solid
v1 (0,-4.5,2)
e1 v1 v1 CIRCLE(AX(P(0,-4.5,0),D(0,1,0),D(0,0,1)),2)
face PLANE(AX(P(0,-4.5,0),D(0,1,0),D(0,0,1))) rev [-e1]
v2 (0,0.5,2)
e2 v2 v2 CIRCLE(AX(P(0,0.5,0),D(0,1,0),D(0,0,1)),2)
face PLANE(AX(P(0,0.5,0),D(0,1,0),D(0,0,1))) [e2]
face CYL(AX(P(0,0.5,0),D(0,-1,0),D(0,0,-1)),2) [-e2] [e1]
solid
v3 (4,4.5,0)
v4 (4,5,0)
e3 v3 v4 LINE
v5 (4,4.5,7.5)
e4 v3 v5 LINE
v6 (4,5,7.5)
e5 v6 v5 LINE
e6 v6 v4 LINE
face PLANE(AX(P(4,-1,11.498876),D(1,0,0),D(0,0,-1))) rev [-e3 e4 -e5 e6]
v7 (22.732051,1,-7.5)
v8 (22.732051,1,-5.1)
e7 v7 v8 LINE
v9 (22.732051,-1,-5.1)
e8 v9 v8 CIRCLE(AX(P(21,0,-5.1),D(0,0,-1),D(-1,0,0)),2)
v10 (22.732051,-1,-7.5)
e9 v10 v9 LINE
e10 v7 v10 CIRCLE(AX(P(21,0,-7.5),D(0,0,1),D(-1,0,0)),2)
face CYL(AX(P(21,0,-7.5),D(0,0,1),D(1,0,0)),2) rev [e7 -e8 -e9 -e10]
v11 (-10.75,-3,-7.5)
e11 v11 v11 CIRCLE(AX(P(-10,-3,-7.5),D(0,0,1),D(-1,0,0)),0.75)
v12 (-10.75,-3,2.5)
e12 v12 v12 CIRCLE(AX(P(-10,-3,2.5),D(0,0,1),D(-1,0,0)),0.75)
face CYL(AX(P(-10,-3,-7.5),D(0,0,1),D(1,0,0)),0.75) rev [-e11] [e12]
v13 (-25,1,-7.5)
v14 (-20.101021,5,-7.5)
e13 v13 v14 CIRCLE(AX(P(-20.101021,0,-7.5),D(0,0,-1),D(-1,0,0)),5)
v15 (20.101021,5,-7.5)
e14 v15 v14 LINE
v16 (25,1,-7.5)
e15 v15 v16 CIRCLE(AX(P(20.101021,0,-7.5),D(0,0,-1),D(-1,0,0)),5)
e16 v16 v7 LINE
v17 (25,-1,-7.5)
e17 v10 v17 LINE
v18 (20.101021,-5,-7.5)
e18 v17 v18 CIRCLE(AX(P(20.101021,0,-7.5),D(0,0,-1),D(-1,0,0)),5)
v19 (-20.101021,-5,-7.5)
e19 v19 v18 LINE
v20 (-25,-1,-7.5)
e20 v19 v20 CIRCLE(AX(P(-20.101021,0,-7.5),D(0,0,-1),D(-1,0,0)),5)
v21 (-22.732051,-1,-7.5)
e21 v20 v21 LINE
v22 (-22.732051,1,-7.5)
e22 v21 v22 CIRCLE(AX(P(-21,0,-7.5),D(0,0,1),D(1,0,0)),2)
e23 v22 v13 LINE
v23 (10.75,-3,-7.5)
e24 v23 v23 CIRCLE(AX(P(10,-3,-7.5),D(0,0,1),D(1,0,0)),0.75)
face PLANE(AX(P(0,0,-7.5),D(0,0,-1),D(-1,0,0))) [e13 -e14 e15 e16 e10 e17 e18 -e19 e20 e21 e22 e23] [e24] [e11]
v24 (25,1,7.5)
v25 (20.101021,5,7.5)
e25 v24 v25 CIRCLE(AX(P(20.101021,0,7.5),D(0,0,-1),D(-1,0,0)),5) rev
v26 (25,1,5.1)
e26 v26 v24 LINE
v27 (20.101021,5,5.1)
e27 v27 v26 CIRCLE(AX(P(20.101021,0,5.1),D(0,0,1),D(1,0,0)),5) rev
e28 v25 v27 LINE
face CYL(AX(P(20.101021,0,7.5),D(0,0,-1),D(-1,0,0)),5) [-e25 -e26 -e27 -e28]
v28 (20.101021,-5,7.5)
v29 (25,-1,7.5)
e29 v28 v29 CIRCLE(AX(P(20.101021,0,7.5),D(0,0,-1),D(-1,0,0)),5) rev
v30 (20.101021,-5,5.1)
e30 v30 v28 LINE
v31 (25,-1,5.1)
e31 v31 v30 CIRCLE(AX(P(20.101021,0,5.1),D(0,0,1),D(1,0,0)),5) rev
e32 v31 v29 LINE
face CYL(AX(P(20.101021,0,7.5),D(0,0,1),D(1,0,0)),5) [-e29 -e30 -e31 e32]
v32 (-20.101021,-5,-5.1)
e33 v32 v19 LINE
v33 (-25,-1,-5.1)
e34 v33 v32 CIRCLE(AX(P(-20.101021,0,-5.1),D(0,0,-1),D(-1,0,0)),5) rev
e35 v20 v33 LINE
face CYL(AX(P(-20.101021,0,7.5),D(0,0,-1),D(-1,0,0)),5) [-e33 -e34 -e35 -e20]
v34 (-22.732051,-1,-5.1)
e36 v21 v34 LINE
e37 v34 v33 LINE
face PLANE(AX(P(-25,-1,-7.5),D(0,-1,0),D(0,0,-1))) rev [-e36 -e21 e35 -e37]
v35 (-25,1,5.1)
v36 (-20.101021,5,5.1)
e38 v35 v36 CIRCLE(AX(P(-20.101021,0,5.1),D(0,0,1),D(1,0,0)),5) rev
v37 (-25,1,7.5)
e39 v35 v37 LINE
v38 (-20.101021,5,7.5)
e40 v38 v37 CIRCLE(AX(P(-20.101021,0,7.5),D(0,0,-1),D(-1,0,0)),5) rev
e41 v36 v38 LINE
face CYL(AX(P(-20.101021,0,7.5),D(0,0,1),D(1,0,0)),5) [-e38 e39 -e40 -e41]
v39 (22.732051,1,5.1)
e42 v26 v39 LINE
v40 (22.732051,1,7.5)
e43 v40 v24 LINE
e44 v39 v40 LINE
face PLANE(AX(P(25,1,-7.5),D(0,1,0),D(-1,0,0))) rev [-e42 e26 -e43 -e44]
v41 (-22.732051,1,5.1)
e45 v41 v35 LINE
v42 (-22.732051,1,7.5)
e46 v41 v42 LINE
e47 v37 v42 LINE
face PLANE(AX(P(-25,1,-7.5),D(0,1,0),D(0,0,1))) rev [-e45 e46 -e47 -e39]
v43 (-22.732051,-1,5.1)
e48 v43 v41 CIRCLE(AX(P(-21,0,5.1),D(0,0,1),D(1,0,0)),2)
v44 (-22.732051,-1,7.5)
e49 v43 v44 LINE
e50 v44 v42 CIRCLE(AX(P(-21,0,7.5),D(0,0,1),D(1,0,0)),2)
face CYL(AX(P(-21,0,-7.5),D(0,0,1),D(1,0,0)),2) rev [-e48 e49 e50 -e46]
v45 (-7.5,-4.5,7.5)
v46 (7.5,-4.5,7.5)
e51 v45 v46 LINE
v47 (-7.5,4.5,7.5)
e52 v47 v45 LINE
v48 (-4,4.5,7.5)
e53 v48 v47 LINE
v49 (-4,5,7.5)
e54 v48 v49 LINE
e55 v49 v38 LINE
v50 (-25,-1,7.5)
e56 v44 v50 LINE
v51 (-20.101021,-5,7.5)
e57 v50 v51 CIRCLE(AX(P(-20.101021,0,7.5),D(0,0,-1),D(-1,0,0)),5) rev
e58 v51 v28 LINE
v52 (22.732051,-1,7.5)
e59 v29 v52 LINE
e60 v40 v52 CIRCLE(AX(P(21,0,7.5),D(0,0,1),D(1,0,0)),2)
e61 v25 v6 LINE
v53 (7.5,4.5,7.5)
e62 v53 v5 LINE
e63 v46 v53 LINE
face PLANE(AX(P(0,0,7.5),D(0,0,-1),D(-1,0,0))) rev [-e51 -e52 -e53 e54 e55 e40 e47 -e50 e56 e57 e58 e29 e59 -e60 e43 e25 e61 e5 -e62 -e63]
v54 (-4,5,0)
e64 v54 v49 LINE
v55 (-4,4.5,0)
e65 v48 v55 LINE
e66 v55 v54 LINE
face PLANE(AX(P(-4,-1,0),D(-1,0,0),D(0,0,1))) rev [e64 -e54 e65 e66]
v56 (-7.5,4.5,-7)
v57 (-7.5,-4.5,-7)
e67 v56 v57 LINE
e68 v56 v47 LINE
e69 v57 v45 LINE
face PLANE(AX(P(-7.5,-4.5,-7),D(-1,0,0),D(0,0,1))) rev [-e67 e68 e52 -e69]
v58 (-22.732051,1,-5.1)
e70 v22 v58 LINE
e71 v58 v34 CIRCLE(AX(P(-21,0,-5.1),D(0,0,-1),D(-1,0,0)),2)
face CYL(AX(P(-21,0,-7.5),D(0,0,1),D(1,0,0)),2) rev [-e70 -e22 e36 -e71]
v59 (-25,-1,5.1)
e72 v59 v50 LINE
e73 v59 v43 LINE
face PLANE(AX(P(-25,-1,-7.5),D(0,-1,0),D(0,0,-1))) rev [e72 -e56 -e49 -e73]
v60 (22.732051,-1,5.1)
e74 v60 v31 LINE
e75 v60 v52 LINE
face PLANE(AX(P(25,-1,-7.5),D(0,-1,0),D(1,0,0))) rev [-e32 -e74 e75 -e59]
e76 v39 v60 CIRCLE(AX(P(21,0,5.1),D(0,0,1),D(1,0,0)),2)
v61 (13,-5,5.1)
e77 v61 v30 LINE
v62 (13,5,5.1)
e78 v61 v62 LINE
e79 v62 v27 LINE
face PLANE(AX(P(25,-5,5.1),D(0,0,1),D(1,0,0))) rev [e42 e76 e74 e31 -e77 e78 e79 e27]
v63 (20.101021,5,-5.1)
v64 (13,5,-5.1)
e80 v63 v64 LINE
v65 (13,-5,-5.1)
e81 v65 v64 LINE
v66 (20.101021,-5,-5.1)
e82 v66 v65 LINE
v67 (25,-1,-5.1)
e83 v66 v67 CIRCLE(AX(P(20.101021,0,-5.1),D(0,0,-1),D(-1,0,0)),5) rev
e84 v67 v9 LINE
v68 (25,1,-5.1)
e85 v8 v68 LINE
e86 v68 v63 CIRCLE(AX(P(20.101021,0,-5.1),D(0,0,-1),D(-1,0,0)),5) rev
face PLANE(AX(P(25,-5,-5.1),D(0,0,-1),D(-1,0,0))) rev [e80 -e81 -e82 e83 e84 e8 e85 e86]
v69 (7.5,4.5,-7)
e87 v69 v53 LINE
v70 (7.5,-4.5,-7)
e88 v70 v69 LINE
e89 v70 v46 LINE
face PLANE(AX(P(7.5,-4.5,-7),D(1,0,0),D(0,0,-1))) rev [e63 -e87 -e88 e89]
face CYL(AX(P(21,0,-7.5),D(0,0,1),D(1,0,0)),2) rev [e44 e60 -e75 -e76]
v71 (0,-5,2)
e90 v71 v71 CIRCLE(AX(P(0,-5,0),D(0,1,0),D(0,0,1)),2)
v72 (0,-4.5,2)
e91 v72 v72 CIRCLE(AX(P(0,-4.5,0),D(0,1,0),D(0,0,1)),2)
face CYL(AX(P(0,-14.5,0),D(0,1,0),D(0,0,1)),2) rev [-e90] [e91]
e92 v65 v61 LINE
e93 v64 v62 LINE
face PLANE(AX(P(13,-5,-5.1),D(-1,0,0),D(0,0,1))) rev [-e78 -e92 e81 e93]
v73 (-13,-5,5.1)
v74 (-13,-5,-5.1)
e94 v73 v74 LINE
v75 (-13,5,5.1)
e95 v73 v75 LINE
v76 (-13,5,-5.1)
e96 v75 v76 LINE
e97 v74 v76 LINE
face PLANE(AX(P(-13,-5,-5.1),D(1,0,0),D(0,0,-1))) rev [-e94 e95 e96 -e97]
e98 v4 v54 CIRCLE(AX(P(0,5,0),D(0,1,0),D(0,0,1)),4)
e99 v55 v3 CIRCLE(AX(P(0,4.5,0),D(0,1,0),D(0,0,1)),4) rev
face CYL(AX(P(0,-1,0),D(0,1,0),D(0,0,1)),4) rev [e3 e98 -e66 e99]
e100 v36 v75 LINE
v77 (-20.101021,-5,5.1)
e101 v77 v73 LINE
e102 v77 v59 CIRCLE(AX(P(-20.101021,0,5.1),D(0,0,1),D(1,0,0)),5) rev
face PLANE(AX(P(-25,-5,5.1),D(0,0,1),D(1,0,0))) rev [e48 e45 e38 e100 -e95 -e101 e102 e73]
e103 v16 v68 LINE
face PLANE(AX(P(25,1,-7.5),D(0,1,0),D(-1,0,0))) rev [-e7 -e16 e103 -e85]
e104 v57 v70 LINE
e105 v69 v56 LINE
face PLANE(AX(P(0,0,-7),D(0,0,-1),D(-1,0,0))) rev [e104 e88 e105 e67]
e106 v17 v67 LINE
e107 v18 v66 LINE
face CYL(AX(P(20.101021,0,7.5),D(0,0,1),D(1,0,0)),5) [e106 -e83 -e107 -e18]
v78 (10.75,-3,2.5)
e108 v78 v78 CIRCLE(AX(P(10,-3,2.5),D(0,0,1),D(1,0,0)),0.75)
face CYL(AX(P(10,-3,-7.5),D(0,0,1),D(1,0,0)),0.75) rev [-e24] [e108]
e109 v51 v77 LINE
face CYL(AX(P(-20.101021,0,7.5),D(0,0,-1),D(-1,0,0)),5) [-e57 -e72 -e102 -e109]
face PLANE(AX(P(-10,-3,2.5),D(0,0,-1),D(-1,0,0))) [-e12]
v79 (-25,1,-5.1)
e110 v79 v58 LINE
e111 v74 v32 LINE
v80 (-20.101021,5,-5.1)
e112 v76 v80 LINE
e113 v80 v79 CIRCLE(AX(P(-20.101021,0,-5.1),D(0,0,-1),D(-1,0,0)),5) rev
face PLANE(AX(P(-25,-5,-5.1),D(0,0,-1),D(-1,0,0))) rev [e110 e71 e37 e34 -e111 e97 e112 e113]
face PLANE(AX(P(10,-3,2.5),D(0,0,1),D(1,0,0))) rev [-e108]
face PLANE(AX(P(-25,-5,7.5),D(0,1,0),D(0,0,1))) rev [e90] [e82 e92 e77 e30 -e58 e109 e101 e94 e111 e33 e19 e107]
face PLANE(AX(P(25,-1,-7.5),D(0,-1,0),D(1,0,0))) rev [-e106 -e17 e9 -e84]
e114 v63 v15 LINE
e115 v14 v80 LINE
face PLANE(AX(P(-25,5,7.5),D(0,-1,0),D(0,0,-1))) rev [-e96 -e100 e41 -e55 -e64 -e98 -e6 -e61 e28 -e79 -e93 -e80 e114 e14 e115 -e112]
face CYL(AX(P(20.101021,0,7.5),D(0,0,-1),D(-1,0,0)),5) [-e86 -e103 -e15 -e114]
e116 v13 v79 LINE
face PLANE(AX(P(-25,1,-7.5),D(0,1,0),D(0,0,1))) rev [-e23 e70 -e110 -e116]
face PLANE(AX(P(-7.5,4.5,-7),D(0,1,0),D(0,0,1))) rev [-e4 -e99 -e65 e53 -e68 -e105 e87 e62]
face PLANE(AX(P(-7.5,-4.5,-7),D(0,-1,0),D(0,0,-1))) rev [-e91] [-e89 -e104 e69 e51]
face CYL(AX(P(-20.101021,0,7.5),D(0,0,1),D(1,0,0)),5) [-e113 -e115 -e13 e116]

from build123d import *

# Parameters (mm, degrees)
SKETCH_1_W               = 50
SKETCH_1_H               = 10
EXTRUDE_1_DEPTH          = 7.5
CUT_EXTRUDE_1_DEPTH      = 6
SKETCH_4_W               = 15
SKETCH_4_H               = 9
CUT_EXTRUDE_2_DEPTH      = 14.5
SKETCH_5_R               = 2
EXTRUDE_2_DEPTH          = 5
SKETCH_6_W               = 12
SKETCH_6_H               = 10.2
CUT_EXTRUDE_3_DEPTH      = 28.950849719
CUT_EXTRUDE_4_DEPTH      = 30.580398915
CUT_EXTRUDE_4_DEPTH_BACK = 30.580398915
FILLET_1_R               = 5
CUT_EXTRUDE_START        = -5
SKETCH_8_R               = 0.75
CUT_EXTRUDE_5_DEPTH      = 10
EXTRUDE_START            = -0.5
SKETCH_5_2_R             = 2
EXTRUDE_1_2_DEPTH        = 0.5
CUT_EXTRUDE_START_2      = -10
SKETCH_5_3_R             = 2
CUT_EXTRUDE_1_2_DEPTH    = 10


with BuildPart() as part:
    # 草图1 → Extrude 1 (new, symmetric)
    with BuildSketch(Plane.XY):
        Rectangle(SKETCH_1_W, SKETCH_1_H)
    extrude(amount=EXTRUDE_1_DEPTH, both=True)

    # 草图3 → Cut-Extrude 1 (cut)
    with BuildSketch(Plane(origin=(0, 5, 0), x_dir=(1, 0, 0), z_dir=(0, 1, 0))):
        with BuildLine():
            Line((-4, 0), (-4, -11.498876283))
            Line((-4, -11.498876283), (4, -11.498876283))
            Line((4, -11.498876283), (4, 0))
            ThreePointArc((4, 0), (0, 4), (-4, 0))
        make_face()
    extrude(amount=-CUT_EXTRUDE_1_DEPTH, mode=Mode.SUBTRACT)

    # 草图4 → 切除-拉伸2 (cut)
    with BuildSketch(Plane.XY.offset(7.5)):
        Rectangle(SKETCH_4_W, SKETCH_4_H)
    extrude(amount=-CUT_EXTRUDE_2_DEPTH, mode=Mode.SUBTRACT)

    # 草图5 → 凸台-拉伸2 (add)
    with BuildSketch(Plane(origin=(0, -4.5, 0), x_dir=(1, 0, 0), z_dir=(0, 1, 0))):
        with Locations(Location((0, 0, 0), (0, 0, 90))):
            Circle(SKETCH_5_R)
    extrude(amount=EXTRUDE_2_DEPTH)

    # 草图6 → 切除-拉伸3 (cut, through all)
    with BuildSketch(Plane(origin=(0, 5, 0), x_dir=(1, 0, 0), z_dir=(0, 1, 0))):
        with Locations((-19, 0)):
            Rectangle(SKETCH_6_W, SKETCH_6_H)
        with Locations((19, 0)):
            Rectangle(SKETCH_6_W, SKETCH_6_H)
    extrude(amount=-CUT_EXTRUDE_3_DEPTH, mode=Mode.SUBTRACT)

    # 草图7 → 切除-拉伸4 (cut, two sides: drawn at the far end of the back side and taken through both)
    with BuildSketch(Plane.XY.offset(7.5).offset(-CUT_EXTRUDE_4_DEPTH_BACK)):
        with BuildLine():
            Line((-25, 1), (-22.732050808, 1))
            ThreePointArc((-22.732050808, 1), (-19, 0), (-22.732050808, -1))
            Line((-22.732050808, -1), (-25, -1))
            Line((-25, -1), (-25, 1))
        make_face()
        with BuildLine():
            Line((25, -1), (22.732050808, -1))
            ThreePointArc((22.732050808, -1), (19, 0), (22.732050808, 1))
            Line((22.732050808, 1), (25, 1))
            Line((25, 1), (25, -1))
        make_face()
    extrude(amount=CUT_EXTRUDE_4_DEPTH + CUT_EXTRUDE_4_DEPTH_BACK, mode=Mode.SUBTRACT)

    # 圆角1
    # the kernel refuses this fillet: 5 mm, written as the material it takes off along each edge
    with BuildSketch(Plane(origin=(25, 5, -19.747448714), x_dir=(-1, 0, 0), z_dir=(0, 0, 1)), Plane(origin=(25, 5, -7.147448714), x_dir=(-1, 0, 0), z_dir=(0, 0, 1)), Plane(origin=(-25, 5, 7.147448714), x_dir=(1, 0, 0), z_dir=(0, 0, -1)), Plane(origin=(-25, 5, 19.747448714), x_dir=(1, 0, 0), z_dir=(0, 0, -1))) as fillet_1_piece_1:
        with BuildLine():
            CenterArc((4.898979486, 5), FILLET_1_R, 191.536959033, 78.463040967)
            Line((0, 4), (-0.09797959, 3.98))
            ThreePointArc((-0.09797959, 3.98), (-0.1, 2), (-0.1, 0))
            Line((-0.1, 0), (0, -0.1))
            Line((0, -0.1), (4.898979486, -0.1))
            Line((4.898979486, -0.1), (4.898979486, 0))
        make_face()
    extrude(amount=26.894897428, mode=Mode.SUBTRACT)
    with BuildSketch(Plane(origin=(25, -5, -19.747448714), x_dir=(-1, 0, 0), z_dir=(0, 0, 1)), Plane(origin=(25, -5, -7.147448714), x_dir=(-1, 0, 0), z_dir=(0, 0, 1)), Plane(origin=(-25, -5, 7.147448714), x_dir=(1, 0, 0), z_dir=(0, 0, -1)), Plane(origin=(-25, -5, 19.747448714), x_dir=(1, 0, 0), z_dir=(0, 0, -1))) as fillet_1_piece_2:
        with BuildLine():
            CenterArc((4.898979486, -5), FILLET_1_R, 90, 78.463040967)
            Line((0, -4), (-0.09797959, -3.98))
            ThreePointArc((-0.09797959, -3.98), (-0.1, -2), (-0.1, 0))
            Line((-0.1, 0), (0, 0.1))
            Line((0, 0.1), (4.898979486, 0.1))
            Line((4.898979486, 0.1), (4.898979486, 0))
        make_face()
    extrude(amount=26.894897428, mode=Mode.SUBTRACT)

    # 草图8 → 切除-拉伸5 (cut)
    with BuildSketch(Plane.XY.offset(7.5).offset(CUT_EXTRUDE_START)):
        with Locations((10, -3)):
            Circle(SKETCH_8_R)
        with Locations(Location((-10, -3, 0), (0, 0, 180))):
            Circle(SKETCH_8_R)
    extrude(amount=-CUT_EXTRUDE_5_DEPTH, mode=Mode.SUBTRACT)

    # 草图5<2> → Extrude 1 2 (add)
    with BuildSketch(Plane(origin=(0, -4.5, 0), x_dir=(1, 0, 0), z_dir=(0, 1, 0)).offset(EXTRUDE_START)):
        with Locations(Location((0, 0, 0), (0, 0, 90))):
            Circle(SKETCH_5_2_R)
    extrude(amount=EXTRUDE_1_2_DEPTH)

    # 草图5<3> → Cut-Extrude 1 2 (cut)
    with BuildSketch(Plane(origin=(0, -4.5, 0), x_dir=(1, 0, 0), z_dir=(0, 1, 0)).offset(CUT_EXTRUDE_START_2)):
        with Locations(Location((0, 0, 0), (0, 0, 270))):
            Circle(SKETCH_5_3_R)
    extrude(amount=CUT_EXTRUDE_1_2_DEPTH, mode=Mode.SUBTRACT)


with BuildPart() as cut_extrude_1_2_piece_1:
    # of the separate pieces the step leaves, piece 1, a body of its own (cut_extrude_1_2_pieces)
    add(part.part.solids().sort_by_distance((-13, -5, -5.1))[0])


with BuildPart() as cut_extrude_1_2_piece_2:
    # of the separate pieces the step leaves, piece 2, a body of its own (cut_extrude_1_2_pieces)
    add(part.part.solids().sort_by_distance((0, 0.5, -2))[0])


solid = Compound([cut_extrude_1_2_piece_1.part, cut_extrude_1_2_piece_2.part])
